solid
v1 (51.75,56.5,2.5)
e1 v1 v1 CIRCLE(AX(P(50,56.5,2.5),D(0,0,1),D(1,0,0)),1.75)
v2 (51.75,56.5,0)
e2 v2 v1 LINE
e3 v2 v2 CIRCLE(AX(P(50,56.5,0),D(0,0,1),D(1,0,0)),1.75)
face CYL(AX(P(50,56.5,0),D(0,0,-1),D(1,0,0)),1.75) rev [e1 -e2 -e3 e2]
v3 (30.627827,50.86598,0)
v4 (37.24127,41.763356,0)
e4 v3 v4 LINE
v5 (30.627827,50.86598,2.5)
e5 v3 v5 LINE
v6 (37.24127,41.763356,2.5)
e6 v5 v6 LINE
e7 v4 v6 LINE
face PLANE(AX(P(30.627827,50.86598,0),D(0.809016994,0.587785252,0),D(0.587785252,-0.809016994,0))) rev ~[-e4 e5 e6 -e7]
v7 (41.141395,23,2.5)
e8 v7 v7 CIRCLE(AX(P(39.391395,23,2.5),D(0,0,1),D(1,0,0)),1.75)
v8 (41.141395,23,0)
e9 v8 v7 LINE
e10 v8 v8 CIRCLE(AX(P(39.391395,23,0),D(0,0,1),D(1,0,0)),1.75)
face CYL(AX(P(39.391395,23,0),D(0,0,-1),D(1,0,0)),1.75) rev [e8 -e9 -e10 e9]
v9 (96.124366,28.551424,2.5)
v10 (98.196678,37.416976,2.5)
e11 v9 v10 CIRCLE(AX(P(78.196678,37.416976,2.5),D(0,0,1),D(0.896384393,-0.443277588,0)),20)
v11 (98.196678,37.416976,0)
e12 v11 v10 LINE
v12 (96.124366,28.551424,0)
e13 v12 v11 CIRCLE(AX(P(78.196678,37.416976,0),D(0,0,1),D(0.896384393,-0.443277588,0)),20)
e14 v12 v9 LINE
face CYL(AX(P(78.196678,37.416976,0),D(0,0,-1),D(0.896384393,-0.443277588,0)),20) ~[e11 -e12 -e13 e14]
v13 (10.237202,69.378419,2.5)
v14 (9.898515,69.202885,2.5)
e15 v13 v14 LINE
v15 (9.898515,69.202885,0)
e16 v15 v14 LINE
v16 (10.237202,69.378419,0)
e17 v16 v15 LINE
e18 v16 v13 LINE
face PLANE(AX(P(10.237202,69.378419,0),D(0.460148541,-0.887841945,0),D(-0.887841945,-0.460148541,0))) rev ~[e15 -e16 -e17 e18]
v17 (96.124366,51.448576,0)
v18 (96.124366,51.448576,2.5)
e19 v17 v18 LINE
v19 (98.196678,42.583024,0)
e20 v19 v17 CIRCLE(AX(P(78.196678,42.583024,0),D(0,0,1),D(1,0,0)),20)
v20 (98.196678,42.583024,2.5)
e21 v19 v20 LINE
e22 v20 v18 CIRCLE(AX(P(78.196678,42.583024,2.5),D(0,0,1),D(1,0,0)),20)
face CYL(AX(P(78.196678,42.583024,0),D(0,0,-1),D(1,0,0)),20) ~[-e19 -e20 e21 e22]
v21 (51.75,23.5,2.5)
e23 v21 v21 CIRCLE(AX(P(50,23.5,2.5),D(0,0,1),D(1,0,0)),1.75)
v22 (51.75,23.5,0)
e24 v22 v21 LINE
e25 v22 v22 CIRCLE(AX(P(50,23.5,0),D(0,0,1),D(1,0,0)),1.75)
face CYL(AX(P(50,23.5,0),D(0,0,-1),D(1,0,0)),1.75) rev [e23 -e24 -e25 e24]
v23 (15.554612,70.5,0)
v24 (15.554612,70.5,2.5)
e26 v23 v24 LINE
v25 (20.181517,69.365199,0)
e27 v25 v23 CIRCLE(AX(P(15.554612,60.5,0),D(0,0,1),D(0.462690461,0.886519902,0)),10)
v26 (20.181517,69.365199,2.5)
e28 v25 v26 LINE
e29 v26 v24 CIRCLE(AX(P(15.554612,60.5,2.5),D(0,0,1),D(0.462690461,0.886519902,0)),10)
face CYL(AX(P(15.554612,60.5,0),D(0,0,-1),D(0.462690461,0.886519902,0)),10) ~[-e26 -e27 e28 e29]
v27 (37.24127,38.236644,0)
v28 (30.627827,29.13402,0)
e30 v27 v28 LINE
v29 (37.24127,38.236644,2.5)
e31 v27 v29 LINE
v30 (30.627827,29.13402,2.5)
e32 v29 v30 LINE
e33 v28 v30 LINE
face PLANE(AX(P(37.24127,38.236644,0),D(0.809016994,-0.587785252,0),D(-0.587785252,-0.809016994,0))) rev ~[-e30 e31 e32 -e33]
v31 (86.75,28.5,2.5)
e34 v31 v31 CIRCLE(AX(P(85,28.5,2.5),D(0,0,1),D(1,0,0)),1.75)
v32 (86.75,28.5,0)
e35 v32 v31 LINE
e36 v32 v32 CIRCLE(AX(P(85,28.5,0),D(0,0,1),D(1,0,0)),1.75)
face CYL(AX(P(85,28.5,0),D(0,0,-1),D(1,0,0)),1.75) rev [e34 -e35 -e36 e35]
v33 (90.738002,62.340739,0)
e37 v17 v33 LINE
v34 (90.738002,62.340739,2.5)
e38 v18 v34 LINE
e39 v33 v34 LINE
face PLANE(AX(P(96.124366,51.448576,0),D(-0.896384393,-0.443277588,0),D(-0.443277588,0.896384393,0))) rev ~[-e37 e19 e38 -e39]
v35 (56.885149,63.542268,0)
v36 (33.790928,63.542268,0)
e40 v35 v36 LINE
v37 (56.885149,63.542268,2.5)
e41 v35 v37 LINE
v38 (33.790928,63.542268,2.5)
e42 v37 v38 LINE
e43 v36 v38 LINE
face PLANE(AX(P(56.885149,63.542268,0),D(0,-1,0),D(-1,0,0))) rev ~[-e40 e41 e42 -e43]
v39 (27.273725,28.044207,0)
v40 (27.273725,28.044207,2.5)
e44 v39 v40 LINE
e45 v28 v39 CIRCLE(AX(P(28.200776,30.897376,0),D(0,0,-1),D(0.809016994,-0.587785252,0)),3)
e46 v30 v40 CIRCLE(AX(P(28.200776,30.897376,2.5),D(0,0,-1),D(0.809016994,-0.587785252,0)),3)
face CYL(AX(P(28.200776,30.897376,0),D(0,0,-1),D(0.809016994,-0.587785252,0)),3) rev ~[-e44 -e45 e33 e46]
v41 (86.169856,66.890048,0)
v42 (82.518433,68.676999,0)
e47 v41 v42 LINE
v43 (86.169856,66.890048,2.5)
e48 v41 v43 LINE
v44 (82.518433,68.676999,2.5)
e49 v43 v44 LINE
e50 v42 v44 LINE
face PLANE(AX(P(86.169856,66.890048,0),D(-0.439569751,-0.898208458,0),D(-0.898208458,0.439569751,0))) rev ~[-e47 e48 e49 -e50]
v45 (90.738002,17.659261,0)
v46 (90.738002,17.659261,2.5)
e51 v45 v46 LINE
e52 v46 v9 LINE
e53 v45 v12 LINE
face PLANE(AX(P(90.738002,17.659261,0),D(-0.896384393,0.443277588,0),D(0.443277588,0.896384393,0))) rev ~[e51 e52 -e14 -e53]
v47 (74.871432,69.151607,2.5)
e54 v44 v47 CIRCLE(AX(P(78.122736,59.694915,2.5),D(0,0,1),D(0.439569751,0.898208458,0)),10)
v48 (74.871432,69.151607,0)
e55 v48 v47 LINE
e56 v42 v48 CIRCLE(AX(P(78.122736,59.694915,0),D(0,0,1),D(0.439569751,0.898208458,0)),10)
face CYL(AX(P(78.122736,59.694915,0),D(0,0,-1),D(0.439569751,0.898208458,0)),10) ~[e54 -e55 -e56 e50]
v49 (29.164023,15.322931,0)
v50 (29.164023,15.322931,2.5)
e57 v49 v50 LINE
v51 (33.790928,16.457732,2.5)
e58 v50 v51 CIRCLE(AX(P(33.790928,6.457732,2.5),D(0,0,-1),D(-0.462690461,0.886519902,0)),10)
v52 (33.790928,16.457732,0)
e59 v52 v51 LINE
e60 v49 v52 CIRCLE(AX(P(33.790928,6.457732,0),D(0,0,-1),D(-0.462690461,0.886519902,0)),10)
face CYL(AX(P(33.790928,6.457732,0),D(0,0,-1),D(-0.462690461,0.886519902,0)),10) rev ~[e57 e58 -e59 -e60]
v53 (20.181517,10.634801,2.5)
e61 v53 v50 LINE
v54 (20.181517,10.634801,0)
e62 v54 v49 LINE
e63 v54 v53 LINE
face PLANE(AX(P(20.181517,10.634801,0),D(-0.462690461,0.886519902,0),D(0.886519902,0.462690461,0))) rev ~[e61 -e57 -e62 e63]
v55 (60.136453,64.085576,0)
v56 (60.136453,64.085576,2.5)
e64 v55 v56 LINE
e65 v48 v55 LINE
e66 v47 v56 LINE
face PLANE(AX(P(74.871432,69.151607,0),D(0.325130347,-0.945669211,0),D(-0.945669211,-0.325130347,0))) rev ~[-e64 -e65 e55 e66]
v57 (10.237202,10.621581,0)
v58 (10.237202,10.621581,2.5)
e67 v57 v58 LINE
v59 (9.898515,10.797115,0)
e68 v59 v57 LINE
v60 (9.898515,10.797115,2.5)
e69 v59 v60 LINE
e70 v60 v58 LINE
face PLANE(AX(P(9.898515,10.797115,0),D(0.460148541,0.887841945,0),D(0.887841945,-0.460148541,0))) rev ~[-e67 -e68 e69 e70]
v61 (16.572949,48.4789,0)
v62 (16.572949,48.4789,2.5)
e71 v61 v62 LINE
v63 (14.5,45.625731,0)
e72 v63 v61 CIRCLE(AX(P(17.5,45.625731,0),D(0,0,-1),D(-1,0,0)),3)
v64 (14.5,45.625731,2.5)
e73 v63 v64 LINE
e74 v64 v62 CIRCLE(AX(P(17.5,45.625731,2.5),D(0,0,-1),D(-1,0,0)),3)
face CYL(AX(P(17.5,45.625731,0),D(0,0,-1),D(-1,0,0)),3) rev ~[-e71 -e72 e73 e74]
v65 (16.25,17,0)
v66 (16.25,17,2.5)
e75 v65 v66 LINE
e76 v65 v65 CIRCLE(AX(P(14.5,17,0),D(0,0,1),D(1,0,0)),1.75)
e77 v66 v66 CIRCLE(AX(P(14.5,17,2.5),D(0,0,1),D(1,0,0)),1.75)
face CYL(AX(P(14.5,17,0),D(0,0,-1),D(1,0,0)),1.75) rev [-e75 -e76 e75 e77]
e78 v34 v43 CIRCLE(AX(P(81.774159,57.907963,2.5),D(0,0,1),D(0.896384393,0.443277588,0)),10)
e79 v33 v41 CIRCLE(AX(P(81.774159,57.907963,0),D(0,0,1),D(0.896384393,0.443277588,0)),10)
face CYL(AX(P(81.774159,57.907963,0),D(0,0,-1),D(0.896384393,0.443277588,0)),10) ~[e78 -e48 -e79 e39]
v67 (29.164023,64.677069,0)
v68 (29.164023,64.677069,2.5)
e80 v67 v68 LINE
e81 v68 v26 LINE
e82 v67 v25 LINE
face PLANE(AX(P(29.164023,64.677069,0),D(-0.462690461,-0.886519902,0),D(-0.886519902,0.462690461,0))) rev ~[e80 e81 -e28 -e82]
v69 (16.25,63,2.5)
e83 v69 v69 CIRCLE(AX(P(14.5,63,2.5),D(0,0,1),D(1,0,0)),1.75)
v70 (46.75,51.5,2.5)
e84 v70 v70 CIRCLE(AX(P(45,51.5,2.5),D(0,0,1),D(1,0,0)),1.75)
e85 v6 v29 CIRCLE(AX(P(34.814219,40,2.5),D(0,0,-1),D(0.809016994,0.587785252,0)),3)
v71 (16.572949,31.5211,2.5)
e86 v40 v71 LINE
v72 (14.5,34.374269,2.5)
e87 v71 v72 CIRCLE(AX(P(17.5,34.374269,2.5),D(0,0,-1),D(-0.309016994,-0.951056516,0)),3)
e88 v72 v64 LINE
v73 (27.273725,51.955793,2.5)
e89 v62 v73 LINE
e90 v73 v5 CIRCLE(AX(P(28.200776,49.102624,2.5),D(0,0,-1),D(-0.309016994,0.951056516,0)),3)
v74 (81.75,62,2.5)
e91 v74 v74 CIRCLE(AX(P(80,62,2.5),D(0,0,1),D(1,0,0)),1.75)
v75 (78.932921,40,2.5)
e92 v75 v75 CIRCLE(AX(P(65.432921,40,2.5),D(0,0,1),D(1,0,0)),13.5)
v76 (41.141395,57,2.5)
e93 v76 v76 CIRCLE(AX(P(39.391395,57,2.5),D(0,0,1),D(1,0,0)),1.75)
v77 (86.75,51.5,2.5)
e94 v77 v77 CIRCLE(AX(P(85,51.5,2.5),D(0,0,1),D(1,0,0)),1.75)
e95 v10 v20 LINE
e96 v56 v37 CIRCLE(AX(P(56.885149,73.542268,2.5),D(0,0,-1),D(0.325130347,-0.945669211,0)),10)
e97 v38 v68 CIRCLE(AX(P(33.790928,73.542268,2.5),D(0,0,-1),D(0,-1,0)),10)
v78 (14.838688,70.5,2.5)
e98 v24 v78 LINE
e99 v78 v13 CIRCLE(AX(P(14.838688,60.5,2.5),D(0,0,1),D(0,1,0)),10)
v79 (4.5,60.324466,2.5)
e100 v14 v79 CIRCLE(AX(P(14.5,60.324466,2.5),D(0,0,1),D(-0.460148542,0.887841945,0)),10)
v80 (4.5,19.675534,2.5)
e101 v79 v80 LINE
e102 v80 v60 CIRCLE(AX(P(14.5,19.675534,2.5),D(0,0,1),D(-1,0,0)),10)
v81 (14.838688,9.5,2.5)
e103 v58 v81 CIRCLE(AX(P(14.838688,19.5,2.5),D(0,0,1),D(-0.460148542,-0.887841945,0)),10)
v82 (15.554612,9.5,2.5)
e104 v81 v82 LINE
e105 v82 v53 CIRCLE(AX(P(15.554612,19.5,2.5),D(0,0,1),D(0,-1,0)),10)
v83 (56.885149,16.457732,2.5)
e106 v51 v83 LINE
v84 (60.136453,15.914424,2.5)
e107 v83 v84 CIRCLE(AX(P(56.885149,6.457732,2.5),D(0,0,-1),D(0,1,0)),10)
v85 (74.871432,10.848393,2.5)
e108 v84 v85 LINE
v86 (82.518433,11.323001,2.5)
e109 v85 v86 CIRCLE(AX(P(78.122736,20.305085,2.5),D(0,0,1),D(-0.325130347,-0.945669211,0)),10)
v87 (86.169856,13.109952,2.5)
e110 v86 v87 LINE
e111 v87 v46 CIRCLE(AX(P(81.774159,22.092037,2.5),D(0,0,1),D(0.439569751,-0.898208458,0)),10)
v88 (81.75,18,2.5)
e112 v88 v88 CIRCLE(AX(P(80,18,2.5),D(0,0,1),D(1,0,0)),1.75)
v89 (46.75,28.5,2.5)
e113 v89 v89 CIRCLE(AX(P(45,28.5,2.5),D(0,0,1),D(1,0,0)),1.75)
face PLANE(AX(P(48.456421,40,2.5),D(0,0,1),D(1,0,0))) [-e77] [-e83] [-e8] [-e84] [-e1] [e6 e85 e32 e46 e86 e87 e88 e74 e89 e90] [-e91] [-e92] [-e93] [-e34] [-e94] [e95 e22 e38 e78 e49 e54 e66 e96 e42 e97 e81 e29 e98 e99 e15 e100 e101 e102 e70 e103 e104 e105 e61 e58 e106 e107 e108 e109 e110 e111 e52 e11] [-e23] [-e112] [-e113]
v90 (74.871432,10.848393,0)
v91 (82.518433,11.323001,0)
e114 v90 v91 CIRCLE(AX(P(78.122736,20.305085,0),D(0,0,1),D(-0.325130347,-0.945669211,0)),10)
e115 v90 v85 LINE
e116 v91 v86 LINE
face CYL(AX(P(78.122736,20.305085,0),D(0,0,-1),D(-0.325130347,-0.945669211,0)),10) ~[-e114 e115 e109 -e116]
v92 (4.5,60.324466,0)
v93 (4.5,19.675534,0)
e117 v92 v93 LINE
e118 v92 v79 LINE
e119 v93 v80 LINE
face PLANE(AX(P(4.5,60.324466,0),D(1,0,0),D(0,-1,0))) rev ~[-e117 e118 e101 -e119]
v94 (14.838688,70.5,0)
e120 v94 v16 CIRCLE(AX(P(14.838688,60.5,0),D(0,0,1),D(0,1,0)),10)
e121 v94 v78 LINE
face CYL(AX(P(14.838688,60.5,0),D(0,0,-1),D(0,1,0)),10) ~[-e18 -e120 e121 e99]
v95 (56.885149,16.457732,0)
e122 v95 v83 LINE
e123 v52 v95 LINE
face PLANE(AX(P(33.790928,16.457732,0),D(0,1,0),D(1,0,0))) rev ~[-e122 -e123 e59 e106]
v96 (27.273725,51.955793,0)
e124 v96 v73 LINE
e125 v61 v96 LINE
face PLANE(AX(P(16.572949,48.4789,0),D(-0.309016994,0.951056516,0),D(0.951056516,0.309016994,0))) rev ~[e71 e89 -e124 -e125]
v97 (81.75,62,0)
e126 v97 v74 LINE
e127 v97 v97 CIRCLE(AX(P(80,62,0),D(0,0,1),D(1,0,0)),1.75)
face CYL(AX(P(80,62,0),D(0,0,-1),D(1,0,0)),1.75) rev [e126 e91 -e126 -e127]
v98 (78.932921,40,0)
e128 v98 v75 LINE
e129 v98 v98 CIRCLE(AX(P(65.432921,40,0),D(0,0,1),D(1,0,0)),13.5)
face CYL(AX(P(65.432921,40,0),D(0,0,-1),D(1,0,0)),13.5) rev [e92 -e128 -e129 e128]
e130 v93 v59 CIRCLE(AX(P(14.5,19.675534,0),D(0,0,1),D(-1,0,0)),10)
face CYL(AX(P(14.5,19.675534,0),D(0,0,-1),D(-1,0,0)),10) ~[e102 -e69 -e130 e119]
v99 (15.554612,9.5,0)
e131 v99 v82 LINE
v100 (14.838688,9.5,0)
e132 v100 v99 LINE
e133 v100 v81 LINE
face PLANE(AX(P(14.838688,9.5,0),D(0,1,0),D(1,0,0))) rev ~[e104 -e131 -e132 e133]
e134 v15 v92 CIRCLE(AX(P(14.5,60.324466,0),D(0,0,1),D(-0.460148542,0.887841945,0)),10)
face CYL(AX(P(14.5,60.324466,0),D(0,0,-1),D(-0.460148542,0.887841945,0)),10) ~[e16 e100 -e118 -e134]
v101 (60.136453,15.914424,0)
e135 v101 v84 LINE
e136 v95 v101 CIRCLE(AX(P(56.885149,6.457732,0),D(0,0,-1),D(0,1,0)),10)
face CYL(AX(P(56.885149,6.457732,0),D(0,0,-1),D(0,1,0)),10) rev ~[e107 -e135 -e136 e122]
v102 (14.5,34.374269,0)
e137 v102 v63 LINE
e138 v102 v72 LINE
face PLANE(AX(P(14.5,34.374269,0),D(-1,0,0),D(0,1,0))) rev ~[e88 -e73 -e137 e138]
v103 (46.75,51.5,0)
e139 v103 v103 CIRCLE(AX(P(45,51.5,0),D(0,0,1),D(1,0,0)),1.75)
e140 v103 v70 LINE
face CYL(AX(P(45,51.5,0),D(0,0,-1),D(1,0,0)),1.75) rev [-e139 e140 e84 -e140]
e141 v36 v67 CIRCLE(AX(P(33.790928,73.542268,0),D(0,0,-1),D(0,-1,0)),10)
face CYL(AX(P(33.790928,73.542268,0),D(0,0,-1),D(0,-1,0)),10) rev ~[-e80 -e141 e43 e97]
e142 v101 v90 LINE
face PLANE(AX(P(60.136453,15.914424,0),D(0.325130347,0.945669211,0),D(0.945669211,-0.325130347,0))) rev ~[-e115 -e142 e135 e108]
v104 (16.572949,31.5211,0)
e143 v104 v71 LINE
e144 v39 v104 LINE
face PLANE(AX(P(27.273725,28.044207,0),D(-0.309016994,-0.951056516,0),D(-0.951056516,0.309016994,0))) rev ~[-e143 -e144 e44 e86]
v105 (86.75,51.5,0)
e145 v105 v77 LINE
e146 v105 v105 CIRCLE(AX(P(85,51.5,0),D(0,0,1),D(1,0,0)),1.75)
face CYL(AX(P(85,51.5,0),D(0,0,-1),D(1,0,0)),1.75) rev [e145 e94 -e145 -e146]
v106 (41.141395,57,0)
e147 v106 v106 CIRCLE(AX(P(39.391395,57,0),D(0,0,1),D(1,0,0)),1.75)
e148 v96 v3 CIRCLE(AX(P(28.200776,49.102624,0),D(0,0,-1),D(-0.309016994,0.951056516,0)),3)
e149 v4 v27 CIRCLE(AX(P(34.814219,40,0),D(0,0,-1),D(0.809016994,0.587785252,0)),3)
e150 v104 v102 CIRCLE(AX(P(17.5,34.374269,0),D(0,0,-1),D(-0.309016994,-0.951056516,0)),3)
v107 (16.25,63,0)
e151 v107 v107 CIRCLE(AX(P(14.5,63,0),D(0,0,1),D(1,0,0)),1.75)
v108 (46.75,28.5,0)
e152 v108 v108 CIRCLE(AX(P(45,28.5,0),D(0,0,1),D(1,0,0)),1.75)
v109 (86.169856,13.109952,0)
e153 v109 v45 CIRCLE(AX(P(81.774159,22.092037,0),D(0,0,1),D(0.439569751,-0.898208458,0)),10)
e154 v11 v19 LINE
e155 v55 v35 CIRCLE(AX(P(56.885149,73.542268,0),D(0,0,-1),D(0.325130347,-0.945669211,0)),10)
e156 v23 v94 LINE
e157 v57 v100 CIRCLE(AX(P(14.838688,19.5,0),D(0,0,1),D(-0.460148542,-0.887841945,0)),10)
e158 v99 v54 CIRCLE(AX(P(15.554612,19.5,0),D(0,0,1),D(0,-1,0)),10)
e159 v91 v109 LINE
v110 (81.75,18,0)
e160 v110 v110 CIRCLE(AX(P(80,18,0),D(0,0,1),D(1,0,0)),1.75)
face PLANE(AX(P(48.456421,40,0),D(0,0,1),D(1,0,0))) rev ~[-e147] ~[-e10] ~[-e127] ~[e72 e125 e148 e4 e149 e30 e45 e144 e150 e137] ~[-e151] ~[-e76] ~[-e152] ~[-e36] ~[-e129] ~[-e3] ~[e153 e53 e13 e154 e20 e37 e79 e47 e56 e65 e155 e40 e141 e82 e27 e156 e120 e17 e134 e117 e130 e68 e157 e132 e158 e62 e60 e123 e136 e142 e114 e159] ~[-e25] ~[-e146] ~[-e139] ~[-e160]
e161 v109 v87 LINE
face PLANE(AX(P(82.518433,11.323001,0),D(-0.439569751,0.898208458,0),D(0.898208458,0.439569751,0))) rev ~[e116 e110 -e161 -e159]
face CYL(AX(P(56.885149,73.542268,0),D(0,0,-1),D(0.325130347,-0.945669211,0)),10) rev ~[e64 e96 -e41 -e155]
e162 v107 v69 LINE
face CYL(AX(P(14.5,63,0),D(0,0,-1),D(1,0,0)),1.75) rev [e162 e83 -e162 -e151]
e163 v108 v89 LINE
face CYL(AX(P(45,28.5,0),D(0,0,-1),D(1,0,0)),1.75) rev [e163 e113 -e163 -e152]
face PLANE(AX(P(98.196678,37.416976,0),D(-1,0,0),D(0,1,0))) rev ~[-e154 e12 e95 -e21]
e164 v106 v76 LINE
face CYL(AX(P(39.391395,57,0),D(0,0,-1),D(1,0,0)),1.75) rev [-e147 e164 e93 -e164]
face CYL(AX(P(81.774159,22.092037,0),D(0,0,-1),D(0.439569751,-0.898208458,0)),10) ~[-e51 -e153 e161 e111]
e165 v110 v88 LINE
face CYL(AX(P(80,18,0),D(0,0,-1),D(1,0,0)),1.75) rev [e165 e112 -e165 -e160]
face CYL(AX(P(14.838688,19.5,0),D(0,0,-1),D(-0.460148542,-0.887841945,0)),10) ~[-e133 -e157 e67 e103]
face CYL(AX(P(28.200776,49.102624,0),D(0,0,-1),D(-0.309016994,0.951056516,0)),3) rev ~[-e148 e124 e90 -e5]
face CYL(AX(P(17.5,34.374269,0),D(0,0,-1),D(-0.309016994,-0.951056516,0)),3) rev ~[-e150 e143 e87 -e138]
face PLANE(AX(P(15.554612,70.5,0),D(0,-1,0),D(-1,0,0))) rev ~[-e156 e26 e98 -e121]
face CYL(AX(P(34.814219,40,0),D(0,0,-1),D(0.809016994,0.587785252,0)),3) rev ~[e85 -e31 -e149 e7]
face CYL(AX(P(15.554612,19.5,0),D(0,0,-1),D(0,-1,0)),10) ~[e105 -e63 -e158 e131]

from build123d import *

# Parameters (mm, degrees)
F1_R     = 1.75
F1_R_2   = 13.5
F2_DEPTH = 2.5


with BuildPart() as f2:
    # F1 (on Top) → F2 (new body)
    with BuildSketch(Plane.XY):
        with BuildLine():
            Line((10.2372021925, 69.3784194525), (9.8985145849, 69.2028852716))
            ThreePointArc((9.8985145849, 69.2028852716), (5.955561629, 65.5199035219), (4.5, 60.324465819))
            Line((4.5, 60.324465819), (4.5, 40))
            Line((4.5, 40), (4.5, 19.675534181))
            ThreePointArc((4.5, 19.675534181), (5.955561629, 14.4800964781), (9.8985145849, 10.7971147284))
            Line((9.8985145849, 10.7971147284), (10.2372021925, 10.6215805475))
            ThreePointArc((10.2372021925, 10.6215805475), (12.470586525, 9.7844404555), (14.8386876076, 9.5))
            Line((14.8386876076, 9.5), (15.5546120462, 9.5))
            ThreePointArc((15.5546120462, 9.5), (17.9366290245, 9.7878429216), (20.1815166575, 10.634800977))
            Line((20.1815166575, 10.634800977), (29.1640234003, 15.322930568))
            ThreePointArc((29.1640234003, 15.322930568), (31.4089110333, 16.1698886233), (33.7909280117, 16.457731545))
            Line((33.7909280117, 16.457731545), (56.8851493299, 16.457731545))
            ThreePointArc((56.8851493299, 16.457731545), (58.5333421059, 16.3209693791), (60.1364527991, 15.9144236596))
            Line((60.1364527991, 15.9144236596), (74.8714324464, 10.8483931845))
            ThreePointArc((74.8714324464, 10.8483931845), (78.7421893122, 10.3242898655), (82.518433429, 11.3230007209))
            Line((82.518433429, 11.3230007209), (86.1698560542, 13.1099522035))
            ThreePointArc((86.1698560542, 13.1099522035), (88.830601645, 15.0063744472), (90.7380024689, 17.6592608982))
            Line((90.7380024689, 17.6592608982), (96.1243657197, 28.5514243616))
            ThreePointArc((96.1243657197, 28.5514243616), (97.6717100474, 32.8647106004), (98.1966778636, 37.4169761286))
            Line((98.1966778636, 37.4169761286), (98.1966778636, 40))
            Line((98.1966778636, 40), (98.1966778636, 42.5830238714))
            ThreePointArc((98.1966778636, 42.5830238714), (97.6717100474, 47.1352893996), (96.1243657197, 51.4485756384))
            Line((96.1243657197, 51.4485756384), (90.7380024689, 62.3407391018))
            ThreePointArc((90.7380024689, 62.3407391018), (88.830601645, 64.9936255528), (86.1698560542, 66.8900477965))
            Line((86.1698560542, 66.8900477965), (82.518433429, 68.6769992791))
            ThreePointArc((82.518433429, 68.6769992791), (78.7421893122, 69.6757101345), (74.8714324464, 69.1516068155))
            Line((74.8714324464, 69.1516068155), (60.1364527991, 64.0855763404))
            ThreePointArc((60.1364527991, 64.0855763404), (58.5333421059, 63.6790306209), (56.8851493299, 63.542268455))
            Line((56.8851493299, 63.542268455), (33.7909280117, 63.542268455))
            ThreePointArc((33.7909280117, 63.542268455), (31.4089110333, 63.8301113767), (29.1640234003, 64.677069432))
            Line((29.1640234003, 64.677069432), (20.1815166575, 69.365199023))
            ThreePointArc((20.1815166575, 69.365199023), (17.9366290245, 70.2121570784), (15.5546120462, 70.5))
            Line((15.5546120462, 70.5), (14.8386876076, 70.5))
            ThreePointArc((14.8386876076, 70.5), (12.470586525, 70.2155595445), (10.2372021925, 69.3784194525))
        make_face()
        with Locations((14.5, 17)):
            Circle(F1_R, mode=Mode.SUBTRACT)
        with Locations((39.3913947046, 23)):
            Circle(F1_R, mode=Mode.SUBTRACT)
        with Locations((50, 23.5)):
            Circle(F1_R, mode=Mode.SUBTRACT)
        with BuildLine():
            ThreePointArc((27.2737251007, 51.9557933746), (29.1278270669, 51.9557933746), (30.6278270669, 50.8659795825))
            Line((30.6278270669, 50.8659795825), (37.2412703927, 41.7633557569))
            ThreePointArc((37.2412703927, 41.7633557569), (37.8142194096, 40), (37.2412703927, 38.2366442431))
            Line((37.2412703927, 38.2366442431), (30.6278270669, 29.1340204175))
            ThreePointArc((30.6278270669, 29.1340204175), (29.1278270669, 28.0442066254), (27.2737251007, 28.0442066254))
            Line((27.2737251007, 28.0442066254), (16.5729490169, 31.52109954))
            ThreePointArc((16.5729490169, 31.52109954), (15.0729490169, 32.6109133321), (14.5, 34.3742690889))
            Line((14.5, 34.3742690889), (14.5, 45.6257309111))
            ThreePointArc((14.5, 45.6257309111), (15.0729490169, 47.3890866679), (16.5729490169, 48.47890046))
            Line((16.5729490169, 48.47890046), (27.2737251007, 51.9557933746))
        make_face(mode=Mode.SUBTRACT)
        with Locations((45, 28.5)):
            Circle(F1_R, mode=Mode.SUBTRACT)
        with Locations((80, 18)):
            Circle(F1_R, mode=Mode.SUBTRACT)
        with Locations((85, 28.5)):
            Circle(F1_R, mode=Mode.SUBTRACT)
        with Locations((45, 51.5)):
            Circle(F1_R, mode=Mode.SUBTRACT)
        with Locations((14.5, 63)):
            Circle(F1_R, mode=Mode.SUBTRACT)
        with Locations((39.3913947046, 57)):
            Circle(F1_R, mode=Mode.SUBTRACT)
        with Locations((50, 56.5)):
            Circle(F1_R, mode=Mode.SUBTRACT)
        with Locations((65.432921052, 40)):
            Circle(F1_R_2, mode=Mode.SUBTRACT)
        with Locations((85, 51.5)):
            Circle(F1_R, mode=Mode.SUBTRACT)
        with Locations((80, 62)):
            Circle(F1_R, mode=Mode.SUBTRACT)
    extrude(amount=F2_DEPTH)


solid = f2.part
